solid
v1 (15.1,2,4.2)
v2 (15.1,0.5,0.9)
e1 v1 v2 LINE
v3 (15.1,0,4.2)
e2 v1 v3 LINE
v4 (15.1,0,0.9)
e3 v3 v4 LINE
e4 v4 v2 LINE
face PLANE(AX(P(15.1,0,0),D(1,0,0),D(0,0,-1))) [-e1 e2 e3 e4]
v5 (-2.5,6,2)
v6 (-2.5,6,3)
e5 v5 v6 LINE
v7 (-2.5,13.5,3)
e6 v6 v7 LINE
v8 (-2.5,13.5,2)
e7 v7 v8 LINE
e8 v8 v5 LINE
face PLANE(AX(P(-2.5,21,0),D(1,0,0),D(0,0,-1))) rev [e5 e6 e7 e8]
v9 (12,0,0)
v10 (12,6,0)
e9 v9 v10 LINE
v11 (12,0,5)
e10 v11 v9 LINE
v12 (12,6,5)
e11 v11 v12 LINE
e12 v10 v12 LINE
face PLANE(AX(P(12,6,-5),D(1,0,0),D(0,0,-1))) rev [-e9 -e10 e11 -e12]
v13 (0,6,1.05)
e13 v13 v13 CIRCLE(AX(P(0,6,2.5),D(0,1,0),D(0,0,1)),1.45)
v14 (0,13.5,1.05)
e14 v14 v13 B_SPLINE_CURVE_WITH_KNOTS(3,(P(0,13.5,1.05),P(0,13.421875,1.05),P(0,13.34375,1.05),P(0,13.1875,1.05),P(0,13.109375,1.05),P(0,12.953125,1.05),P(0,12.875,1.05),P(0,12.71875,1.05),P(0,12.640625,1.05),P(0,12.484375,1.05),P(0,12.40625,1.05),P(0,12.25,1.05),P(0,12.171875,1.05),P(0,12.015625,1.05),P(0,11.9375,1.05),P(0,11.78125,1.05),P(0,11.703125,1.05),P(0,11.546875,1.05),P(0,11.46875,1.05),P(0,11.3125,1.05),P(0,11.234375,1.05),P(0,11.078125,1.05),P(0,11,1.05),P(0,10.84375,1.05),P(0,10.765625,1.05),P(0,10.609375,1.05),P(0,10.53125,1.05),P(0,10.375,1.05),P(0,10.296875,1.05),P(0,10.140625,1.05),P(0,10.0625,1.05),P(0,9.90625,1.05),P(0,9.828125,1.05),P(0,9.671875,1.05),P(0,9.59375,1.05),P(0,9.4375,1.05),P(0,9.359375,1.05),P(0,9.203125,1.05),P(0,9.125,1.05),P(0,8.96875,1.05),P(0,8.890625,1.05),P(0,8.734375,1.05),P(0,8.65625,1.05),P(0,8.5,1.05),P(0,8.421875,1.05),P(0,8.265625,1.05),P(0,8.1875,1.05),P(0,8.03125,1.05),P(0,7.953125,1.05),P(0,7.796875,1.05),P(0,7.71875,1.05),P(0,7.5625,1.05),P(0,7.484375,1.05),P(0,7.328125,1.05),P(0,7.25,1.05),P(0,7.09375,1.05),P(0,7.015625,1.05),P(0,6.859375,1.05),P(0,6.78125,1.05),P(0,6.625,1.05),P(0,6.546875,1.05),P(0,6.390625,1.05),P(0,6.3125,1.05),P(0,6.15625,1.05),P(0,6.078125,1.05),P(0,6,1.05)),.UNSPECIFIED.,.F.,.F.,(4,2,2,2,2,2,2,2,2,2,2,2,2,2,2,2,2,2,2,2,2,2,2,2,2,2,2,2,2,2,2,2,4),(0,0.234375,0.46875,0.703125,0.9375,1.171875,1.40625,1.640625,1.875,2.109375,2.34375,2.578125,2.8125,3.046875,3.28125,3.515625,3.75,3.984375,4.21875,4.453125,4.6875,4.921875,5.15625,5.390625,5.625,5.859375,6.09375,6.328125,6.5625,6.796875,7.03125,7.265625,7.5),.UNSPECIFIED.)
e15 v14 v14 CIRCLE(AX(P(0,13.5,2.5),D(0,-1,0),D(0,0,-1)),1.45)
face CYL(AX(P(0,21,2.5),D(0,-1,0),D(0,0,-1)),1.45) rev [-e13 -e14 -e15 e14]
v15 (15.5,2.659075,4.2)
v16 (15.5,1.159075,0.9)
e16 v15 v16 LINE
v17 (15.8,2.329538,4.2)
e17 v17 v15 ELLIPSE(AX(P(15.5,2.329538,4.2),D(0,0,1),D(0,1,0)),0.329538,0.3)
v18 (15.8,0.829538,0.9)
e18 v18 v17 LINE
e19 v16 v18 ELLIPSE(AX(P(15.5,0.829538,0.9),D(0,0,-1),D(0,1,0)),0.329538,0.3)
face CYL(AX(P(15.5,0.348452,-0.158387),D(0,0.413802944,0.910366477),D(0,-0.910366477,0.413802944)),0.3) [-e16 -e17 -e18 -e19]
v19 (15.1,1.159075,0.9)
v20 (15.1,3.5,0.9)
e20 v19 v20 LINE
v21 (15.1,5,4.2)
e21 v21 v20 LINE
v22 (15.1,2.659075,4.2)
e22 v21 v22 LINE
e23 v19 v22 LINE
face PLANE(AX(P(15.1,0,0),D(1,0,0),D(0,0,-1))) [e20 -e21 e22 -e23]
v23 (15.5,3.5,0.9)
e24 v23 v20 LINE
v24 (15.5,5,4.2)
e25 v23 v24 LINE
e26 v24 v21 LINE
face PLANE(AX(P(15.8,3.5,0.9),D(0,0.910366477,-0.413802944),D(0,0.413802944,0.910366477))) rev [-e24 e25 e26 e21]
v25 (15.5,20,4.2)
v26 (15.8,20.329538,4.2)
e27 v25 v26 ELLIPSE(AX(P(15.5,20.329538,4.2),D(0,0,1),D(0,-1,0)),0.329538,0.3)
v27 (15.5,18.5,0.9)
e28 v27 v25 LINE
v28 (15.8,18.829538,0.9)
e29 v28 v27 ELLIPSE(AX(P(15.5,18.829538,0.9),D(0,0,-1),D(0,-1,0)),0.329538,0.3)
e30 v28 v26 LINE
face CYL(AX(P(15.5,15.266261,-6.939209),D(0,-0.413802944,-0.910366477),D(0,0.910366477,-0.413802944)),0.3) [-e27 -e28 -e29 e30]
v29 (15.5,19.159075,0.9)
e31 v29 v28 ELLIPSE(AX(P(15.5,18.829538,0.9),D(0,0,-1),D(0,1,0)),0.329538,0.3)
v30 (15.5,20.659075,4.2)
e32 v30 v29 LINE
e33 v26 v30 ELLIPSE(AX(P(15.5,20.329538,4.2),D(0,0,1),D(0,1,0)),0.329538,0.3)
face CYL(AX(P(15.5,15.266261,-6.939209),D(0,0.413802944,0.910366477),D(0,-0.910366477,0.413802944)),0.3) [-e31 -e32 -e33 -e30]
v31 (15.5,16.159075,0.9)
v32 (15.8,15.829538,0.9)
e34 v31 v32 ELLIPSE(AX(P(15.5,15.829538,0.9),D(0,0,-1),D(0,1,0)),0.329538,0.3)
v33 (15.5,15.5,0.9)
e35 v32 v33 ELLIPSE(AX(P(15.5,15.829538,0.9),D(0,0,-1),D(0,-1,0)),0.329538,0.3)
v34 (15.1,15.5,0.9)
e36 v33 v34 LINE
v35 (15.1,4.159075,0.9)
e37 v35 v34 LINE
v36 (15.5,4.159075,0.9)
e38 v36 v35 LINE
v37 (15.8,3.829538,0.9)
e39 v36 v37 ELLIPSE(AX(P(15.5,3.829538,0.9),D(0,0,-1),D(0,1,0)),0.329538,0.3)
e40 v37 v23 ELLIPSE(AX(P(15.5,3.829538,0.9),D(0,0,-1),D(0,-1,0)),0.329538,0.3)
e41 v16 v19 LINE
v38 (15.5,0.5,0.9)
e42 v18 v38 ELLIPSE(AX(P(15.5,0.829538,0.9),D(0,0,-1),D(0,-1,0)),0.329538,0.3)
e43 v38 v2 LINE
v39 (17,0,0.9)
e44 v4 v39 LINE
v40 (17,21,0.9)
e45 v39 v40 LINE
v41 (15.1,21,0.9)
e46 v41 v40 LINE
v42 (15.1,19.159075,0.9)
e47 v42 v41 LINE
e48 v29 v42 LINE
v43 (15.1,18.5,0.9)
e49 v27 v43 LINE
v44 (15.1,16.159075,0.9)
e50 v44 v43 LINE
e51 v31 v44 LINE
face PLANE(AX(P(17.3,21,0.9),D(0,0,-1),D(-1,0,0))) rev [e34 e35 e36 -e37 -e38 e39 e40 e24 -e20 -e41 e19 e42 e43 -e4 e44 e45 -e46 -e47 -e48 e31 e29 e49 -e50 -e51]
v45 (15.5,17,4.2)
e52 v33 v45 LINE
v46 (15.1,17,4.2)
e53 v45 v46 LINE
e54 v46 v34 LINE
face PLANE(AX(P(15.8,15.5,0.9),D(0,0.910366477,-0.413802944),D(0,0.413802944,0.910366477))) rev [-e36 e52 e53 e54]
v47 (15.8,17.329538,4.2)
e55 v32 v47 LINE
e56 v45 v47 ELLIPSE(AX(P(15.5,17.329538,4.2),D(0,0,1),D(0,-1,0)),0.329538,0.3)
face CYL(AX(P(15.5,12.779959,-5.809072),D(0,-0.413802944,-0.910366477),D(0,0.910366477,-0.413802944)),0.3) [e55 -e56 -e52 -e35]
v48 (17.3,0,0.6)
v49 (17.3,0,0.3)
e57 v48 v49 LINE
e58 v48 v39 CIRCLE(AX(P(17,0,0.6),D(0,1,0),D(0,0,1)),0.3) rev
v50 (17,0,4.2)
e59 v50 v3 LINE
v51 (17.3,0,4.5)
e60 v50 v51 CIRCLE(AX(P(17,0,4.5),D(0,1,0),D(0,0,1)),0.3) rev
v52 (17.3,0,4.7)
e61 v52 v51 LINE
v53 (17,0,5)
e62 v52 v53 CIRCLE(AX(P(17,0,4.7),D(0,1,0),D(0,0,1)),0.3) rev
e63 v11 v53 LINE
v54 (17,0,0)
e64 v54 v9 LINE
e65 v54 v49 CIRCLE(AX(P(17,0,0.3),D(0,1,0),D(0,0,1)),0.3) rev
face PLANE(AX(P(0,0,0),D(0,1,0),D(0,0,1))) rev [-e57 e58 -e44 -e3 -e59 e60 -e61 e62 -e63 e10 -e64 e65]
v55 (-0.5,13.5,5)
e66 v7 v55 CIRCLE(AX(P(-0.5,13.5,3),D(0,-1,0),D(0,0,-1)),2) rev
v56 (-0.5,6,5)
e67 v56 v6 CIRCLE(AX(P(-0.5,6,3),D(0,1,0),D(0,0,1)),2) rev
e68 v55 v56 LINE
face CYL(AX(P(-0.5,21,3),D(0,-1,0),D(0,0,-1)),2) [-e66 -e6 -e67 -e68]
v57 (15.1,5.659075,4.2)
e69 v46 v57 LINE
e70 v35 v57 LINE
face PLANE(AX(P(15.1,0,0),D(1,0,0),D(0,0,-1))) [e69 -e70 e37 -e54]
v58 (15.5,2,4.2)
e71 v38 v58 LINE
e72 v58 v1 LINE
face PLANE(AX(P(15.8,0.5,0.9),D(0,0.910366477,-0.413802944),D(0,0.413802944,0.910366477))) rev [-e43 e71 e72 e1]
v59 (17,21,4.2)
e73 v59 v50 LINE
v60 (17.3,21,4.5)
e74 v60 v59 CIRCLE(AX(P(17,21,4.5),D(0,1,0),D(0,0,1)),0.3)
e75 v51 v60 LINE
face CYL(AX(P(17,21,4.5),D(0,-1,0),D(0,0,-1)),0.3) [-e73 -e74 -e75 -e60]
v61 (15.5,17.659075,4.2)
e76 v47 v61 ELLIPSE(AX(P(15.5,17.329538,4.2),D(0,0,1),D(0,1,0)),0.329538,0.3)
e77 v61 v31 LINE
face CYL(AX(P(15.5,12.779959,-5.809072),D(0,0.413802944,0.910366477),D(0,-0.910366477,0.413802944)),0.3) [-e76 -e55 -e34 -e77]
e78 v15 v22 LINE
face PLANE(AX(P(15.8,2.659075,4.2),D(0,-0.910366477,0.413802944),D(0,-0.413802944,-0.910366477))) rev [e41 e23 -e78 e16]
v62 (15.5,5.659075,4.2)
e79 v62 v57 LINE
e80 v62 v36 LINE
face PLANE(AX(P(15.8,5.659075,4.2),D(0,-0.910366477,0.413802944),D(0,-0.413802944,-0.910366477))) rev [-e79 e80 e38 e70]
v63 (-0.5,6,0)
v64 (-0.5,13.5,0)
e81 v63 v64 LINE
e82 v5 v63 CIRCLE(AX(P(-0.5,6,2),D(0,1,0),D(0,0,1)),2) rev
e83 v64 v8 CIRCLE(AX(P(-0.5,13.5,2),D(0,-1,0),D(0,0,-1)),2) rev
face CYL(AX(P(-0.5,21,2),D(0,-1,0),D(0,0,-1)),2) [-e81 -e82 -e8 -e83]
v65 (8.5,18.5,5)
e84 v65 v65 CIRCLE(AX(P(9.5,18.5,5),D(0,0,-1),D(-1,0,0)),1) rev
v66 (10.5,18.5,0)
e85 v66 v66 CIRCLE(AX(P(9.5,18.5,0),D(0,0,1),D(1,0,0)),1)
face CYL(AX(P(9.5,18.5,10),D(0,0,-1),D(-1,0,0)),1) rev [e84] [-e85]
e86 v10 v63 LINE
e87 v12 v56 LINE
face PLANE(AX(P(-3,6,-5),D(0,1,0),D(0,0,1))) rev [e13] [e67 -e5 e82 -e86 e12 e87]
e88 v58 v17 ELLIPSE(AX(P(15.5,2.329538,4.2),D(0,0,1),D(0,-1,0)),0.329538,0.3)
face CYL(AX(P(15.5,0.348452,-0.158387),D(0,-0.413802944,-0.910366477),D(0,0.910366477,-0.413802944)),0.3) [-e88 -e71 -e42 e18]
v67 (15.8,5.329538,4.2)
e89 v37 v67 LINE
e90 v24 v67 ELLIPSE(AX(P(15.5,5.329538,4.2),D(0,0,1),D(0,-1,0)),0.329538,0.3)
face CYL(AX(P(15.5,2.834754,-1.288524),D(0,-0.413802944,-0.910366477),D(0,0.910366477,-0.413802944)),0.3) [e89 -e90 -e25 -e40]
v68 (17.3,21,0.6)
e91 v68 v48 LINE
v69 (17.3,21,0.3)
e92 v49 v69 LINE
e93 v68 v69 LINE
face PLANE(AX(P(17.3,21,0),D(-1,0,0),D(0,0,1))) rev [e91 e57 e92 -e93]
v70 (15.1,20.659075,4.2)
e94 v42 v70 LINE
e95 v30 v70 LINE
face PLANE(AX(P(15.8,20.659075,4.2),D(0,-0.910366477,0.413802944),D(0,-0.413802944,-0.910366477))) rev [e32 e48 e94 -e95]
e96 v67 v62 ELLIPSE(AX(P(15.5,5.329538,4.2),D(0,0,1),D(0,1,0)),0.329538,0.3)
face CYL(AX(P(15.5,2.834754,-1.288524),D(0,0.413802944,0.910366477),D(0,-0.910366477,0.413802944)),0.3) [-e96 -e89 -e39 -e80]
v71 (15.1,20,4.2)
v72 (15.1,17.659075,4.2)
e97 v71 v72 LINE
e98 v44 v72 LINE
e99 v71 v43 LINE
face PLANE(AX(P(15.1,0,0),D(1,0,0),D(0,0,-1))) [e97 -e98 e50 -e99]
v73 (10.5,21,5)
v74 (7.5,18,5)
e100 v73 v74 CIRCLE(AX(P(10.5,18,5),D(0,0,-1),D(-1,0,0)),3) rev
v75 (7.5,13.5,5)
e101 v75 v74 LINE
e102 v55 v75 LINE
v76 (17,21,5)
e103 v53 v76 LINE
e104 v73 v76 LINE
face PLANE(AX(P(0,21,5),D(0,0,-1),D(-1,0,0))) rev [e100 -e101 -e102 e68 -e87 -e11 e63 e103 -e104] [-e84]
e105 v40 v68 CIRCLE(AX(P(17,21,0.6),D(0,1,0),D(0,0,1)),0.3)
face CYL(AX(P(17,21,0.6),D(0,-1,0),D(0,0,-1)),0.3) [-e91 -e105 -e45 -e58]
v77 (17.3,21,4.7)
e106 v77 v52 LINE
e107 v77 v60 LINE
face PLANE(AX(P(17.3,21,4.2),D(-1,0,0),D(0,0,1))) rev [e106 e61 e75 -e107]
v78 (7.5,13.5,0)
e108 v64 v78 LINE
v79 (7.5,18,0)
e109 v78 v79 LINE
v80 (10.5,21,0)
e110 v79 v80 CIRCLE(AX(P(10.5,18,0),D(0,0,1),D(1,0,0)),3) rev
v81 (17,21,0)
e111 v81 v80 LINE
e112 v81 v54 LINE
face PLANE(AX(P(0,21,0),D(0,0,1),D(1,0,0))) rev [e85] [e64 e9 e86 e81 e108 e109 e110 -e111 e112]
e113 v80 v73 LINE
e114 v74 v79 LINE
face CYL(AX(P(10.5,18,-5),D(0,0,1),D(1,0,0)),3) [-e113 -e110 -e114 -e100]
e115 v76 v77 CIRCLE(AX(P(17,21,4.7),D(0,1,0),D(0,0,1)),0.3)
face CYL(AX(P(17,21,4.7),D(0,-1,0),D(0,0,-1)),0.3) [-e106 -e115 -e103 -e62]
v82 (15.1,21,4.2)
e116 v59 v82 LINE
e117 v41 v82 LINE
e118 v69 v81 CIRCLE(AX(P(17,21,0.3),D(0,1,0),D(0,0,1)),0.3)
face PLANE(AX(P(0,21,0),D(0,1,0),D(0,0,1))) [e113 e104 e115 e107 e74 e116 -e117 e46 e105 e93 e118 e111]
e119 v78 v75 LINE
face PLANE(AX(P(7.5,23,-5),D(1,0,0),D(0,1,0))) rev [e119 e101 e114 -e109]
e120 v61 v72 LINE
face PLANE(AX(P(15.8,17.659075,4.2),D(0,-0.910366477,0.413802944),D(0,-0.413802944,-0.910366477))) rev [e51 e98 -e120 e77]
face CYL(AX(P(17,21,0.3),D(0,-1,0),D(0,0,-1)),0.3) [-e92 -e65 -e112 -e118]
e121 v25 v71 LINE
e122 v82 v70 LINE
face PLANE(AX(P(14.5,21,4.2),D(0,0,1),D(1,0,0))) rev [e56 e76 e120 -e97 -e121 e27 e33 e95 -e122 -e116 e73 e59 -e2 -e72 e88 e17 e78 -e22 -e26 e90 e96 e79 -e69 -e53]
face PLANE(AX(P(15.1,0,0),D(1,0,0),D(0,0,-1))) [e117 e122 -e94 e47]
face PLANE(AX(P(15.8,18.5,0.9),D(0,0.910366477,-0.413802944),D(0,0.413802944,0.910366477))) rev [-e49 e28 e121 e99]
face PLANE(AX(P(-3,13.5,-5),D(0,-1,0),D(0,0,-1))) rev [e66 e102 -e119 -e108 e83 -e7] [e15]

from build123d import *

# Parameters (mm, degrees)
SKETCH_1_R          = 1.45
EXTRUDE_1_DEPTH     = 21
EXTRUDE_2_DEPTH     = 1.3
FILLET_1_R          = 0.3
FILLET_2_R          = 0.3
SKETCH_3_R          = 1
CUT_EXTRUDE_3_DEPTH = 10
FILLET_3_R          = 2
SKETCH_4_W          = 3.3
SKETCH_4_H          = 21
EXTRUDE_4_DEPTH     = 0.6
SKETCH_7_W          = 15
SKETCH_7_H          = 13.536537926
SKETCH_7_W_2        = 10.5
SKETCH_7_H_2        = 9.5
CUT_EXTRUDE_4_DEPTH = 10
FILLET_7_R          = 3


with BuildPart() as part:
    # 草圖1 → 填料-伸長1 (new body)
    with BuildSketch(Plane(origin=(0, 0, 0), x_dir=(1, 0, 0), z_dir=(0, 1, 0))):
        Polygon((17.3, -0.9), (14.5, -0.9), (14.5, -4.2), (17.3, -4.2), (17.3, -5), (0, -5), (-2.5, -5), (-2.5, 0), (0, 0), (17.3, 0), align=None)
        with Locations(Location((0, -2.5, 0), (0, 0, 90))):
            Circle(SKETCH_1_R, mode=Mode.SUBTRACT)
    extrude(amount=EXTRUDE_1_DEPTH)

    # 草圖2 → 填料-伸長2 (add)
    with BuildSketch(Plane(origin=(14.5, 0, 0), x_dir=(0, 0, -1), z_dir=(1, 0, 0))):
        Polygon((-4.2, 5.659075235), (-0.9, 4.159075235), (-0.9, 3.5), (-4.2, 5), align=None)
        Polygon((-4.2, 2.659075235), (-0.9, 1.159075235), (-0.9, 0.5), (-4.2, 2), align=None)
        Polygon((-4.2, 17.659075235), (-0.9, 16.159075235), (-0.9, 15.5), (-4.2, 17), align=None)
        Polygon((-4.2, 20.659075235), (-0.9, 19.159075235), (-0.9, 18.5), (-4.2, 20), align=None)
    extrude(amount=EXTRUDE_2_DEPTH)

    # 圓角1
    fillet_1_edges = [part.edges().sort_by_distance(p)[0] for p in [
        (15.8, 1.909075235, 2.55),
        (15.8, 1.25, 2.55),
        (15.8, 4.25, 2.55),
        (15.8, 4.909075235, 2.55),
        (15.8, 16.25, 2.55),
        (15.8, 16.909075235, 2.55),
        (15.8, 19.25, 2.55),
        (15.8, 19.909075235, 2.55),
    ]]
    fillet(fillet_1_edges, radius=FILLET_1_R - 0.0001)  # a hair under: the kernel refuses the full size

    # 圓角2
    fillet_2_edges = [part.edges().sort_by_distance(p)[0] for p in [
        (17.3, 10.5, 0),
        (17.3, 10.5, 0.9),
        (17.3, 10.5, 4.2),
        (17.3, 10.5, 5),
    ]]
    fillet(fillet_2_edges, radius=FILLET_2_R)

    # 草圖3 → 除料-伸長3 (cut)
    with BuildSketch(Plane.XY):
        with Locations(Location((9.5, 18.5, 0), (0, 0, 180))):
            Circle(SKETCH_3_R)
    extrude(amount=CUT_EXTRUDE_3_DEPTH, mode=Mode.SUBTRACT)

    # 圓角3
    fillet_3_edges = [part.edges().sort_by_distance(p)[0] for p in [
        (-2.5, 10.5, 5),
        (-2.5, 10.5, 0),
    ]]
    fillet(fillet_3_edges, radius=FILLET_3_R)

    # 草圖4 → 填料-伸長4 (add)
    with BuildSketch(Plane(origin=(14.5, 0, 0), x_dir=(0, 0, -1), z_dir=(1, 0, 0))):
        with Locations((-2.55, 10.5)):
            Rectangle(SKETCH_4_W, SKETCH_4_H)
    extrude(amount=EXTRUDE_4_DEPTH)

    # 草圖7 → 除料-伸長4 (cut)
    with BuildSketch(Plane.XY.offset(5)):
        with Locations((4.5, -0.768268963)):
            Rectangle(SKETCH_7_W, SKETCH_7_H)
        with Locations((2.25, 18.25)):
            Rectangle(SKETCH_7_W_2, SKETCH_7_H_2)
    extrude(amount=-CUT_EXTRUDE_4_DEPTH, mode=Mode.SUBTRACT)

    # 圓角7
    fillet_7_edges = [part.edges().sort_by_distance(p)[0] for p in [
        (7.5, 21, 2.5),
    ]]
    fillet(fillet_7_edges, radius=FILLET_7_R)


solid = part.part
